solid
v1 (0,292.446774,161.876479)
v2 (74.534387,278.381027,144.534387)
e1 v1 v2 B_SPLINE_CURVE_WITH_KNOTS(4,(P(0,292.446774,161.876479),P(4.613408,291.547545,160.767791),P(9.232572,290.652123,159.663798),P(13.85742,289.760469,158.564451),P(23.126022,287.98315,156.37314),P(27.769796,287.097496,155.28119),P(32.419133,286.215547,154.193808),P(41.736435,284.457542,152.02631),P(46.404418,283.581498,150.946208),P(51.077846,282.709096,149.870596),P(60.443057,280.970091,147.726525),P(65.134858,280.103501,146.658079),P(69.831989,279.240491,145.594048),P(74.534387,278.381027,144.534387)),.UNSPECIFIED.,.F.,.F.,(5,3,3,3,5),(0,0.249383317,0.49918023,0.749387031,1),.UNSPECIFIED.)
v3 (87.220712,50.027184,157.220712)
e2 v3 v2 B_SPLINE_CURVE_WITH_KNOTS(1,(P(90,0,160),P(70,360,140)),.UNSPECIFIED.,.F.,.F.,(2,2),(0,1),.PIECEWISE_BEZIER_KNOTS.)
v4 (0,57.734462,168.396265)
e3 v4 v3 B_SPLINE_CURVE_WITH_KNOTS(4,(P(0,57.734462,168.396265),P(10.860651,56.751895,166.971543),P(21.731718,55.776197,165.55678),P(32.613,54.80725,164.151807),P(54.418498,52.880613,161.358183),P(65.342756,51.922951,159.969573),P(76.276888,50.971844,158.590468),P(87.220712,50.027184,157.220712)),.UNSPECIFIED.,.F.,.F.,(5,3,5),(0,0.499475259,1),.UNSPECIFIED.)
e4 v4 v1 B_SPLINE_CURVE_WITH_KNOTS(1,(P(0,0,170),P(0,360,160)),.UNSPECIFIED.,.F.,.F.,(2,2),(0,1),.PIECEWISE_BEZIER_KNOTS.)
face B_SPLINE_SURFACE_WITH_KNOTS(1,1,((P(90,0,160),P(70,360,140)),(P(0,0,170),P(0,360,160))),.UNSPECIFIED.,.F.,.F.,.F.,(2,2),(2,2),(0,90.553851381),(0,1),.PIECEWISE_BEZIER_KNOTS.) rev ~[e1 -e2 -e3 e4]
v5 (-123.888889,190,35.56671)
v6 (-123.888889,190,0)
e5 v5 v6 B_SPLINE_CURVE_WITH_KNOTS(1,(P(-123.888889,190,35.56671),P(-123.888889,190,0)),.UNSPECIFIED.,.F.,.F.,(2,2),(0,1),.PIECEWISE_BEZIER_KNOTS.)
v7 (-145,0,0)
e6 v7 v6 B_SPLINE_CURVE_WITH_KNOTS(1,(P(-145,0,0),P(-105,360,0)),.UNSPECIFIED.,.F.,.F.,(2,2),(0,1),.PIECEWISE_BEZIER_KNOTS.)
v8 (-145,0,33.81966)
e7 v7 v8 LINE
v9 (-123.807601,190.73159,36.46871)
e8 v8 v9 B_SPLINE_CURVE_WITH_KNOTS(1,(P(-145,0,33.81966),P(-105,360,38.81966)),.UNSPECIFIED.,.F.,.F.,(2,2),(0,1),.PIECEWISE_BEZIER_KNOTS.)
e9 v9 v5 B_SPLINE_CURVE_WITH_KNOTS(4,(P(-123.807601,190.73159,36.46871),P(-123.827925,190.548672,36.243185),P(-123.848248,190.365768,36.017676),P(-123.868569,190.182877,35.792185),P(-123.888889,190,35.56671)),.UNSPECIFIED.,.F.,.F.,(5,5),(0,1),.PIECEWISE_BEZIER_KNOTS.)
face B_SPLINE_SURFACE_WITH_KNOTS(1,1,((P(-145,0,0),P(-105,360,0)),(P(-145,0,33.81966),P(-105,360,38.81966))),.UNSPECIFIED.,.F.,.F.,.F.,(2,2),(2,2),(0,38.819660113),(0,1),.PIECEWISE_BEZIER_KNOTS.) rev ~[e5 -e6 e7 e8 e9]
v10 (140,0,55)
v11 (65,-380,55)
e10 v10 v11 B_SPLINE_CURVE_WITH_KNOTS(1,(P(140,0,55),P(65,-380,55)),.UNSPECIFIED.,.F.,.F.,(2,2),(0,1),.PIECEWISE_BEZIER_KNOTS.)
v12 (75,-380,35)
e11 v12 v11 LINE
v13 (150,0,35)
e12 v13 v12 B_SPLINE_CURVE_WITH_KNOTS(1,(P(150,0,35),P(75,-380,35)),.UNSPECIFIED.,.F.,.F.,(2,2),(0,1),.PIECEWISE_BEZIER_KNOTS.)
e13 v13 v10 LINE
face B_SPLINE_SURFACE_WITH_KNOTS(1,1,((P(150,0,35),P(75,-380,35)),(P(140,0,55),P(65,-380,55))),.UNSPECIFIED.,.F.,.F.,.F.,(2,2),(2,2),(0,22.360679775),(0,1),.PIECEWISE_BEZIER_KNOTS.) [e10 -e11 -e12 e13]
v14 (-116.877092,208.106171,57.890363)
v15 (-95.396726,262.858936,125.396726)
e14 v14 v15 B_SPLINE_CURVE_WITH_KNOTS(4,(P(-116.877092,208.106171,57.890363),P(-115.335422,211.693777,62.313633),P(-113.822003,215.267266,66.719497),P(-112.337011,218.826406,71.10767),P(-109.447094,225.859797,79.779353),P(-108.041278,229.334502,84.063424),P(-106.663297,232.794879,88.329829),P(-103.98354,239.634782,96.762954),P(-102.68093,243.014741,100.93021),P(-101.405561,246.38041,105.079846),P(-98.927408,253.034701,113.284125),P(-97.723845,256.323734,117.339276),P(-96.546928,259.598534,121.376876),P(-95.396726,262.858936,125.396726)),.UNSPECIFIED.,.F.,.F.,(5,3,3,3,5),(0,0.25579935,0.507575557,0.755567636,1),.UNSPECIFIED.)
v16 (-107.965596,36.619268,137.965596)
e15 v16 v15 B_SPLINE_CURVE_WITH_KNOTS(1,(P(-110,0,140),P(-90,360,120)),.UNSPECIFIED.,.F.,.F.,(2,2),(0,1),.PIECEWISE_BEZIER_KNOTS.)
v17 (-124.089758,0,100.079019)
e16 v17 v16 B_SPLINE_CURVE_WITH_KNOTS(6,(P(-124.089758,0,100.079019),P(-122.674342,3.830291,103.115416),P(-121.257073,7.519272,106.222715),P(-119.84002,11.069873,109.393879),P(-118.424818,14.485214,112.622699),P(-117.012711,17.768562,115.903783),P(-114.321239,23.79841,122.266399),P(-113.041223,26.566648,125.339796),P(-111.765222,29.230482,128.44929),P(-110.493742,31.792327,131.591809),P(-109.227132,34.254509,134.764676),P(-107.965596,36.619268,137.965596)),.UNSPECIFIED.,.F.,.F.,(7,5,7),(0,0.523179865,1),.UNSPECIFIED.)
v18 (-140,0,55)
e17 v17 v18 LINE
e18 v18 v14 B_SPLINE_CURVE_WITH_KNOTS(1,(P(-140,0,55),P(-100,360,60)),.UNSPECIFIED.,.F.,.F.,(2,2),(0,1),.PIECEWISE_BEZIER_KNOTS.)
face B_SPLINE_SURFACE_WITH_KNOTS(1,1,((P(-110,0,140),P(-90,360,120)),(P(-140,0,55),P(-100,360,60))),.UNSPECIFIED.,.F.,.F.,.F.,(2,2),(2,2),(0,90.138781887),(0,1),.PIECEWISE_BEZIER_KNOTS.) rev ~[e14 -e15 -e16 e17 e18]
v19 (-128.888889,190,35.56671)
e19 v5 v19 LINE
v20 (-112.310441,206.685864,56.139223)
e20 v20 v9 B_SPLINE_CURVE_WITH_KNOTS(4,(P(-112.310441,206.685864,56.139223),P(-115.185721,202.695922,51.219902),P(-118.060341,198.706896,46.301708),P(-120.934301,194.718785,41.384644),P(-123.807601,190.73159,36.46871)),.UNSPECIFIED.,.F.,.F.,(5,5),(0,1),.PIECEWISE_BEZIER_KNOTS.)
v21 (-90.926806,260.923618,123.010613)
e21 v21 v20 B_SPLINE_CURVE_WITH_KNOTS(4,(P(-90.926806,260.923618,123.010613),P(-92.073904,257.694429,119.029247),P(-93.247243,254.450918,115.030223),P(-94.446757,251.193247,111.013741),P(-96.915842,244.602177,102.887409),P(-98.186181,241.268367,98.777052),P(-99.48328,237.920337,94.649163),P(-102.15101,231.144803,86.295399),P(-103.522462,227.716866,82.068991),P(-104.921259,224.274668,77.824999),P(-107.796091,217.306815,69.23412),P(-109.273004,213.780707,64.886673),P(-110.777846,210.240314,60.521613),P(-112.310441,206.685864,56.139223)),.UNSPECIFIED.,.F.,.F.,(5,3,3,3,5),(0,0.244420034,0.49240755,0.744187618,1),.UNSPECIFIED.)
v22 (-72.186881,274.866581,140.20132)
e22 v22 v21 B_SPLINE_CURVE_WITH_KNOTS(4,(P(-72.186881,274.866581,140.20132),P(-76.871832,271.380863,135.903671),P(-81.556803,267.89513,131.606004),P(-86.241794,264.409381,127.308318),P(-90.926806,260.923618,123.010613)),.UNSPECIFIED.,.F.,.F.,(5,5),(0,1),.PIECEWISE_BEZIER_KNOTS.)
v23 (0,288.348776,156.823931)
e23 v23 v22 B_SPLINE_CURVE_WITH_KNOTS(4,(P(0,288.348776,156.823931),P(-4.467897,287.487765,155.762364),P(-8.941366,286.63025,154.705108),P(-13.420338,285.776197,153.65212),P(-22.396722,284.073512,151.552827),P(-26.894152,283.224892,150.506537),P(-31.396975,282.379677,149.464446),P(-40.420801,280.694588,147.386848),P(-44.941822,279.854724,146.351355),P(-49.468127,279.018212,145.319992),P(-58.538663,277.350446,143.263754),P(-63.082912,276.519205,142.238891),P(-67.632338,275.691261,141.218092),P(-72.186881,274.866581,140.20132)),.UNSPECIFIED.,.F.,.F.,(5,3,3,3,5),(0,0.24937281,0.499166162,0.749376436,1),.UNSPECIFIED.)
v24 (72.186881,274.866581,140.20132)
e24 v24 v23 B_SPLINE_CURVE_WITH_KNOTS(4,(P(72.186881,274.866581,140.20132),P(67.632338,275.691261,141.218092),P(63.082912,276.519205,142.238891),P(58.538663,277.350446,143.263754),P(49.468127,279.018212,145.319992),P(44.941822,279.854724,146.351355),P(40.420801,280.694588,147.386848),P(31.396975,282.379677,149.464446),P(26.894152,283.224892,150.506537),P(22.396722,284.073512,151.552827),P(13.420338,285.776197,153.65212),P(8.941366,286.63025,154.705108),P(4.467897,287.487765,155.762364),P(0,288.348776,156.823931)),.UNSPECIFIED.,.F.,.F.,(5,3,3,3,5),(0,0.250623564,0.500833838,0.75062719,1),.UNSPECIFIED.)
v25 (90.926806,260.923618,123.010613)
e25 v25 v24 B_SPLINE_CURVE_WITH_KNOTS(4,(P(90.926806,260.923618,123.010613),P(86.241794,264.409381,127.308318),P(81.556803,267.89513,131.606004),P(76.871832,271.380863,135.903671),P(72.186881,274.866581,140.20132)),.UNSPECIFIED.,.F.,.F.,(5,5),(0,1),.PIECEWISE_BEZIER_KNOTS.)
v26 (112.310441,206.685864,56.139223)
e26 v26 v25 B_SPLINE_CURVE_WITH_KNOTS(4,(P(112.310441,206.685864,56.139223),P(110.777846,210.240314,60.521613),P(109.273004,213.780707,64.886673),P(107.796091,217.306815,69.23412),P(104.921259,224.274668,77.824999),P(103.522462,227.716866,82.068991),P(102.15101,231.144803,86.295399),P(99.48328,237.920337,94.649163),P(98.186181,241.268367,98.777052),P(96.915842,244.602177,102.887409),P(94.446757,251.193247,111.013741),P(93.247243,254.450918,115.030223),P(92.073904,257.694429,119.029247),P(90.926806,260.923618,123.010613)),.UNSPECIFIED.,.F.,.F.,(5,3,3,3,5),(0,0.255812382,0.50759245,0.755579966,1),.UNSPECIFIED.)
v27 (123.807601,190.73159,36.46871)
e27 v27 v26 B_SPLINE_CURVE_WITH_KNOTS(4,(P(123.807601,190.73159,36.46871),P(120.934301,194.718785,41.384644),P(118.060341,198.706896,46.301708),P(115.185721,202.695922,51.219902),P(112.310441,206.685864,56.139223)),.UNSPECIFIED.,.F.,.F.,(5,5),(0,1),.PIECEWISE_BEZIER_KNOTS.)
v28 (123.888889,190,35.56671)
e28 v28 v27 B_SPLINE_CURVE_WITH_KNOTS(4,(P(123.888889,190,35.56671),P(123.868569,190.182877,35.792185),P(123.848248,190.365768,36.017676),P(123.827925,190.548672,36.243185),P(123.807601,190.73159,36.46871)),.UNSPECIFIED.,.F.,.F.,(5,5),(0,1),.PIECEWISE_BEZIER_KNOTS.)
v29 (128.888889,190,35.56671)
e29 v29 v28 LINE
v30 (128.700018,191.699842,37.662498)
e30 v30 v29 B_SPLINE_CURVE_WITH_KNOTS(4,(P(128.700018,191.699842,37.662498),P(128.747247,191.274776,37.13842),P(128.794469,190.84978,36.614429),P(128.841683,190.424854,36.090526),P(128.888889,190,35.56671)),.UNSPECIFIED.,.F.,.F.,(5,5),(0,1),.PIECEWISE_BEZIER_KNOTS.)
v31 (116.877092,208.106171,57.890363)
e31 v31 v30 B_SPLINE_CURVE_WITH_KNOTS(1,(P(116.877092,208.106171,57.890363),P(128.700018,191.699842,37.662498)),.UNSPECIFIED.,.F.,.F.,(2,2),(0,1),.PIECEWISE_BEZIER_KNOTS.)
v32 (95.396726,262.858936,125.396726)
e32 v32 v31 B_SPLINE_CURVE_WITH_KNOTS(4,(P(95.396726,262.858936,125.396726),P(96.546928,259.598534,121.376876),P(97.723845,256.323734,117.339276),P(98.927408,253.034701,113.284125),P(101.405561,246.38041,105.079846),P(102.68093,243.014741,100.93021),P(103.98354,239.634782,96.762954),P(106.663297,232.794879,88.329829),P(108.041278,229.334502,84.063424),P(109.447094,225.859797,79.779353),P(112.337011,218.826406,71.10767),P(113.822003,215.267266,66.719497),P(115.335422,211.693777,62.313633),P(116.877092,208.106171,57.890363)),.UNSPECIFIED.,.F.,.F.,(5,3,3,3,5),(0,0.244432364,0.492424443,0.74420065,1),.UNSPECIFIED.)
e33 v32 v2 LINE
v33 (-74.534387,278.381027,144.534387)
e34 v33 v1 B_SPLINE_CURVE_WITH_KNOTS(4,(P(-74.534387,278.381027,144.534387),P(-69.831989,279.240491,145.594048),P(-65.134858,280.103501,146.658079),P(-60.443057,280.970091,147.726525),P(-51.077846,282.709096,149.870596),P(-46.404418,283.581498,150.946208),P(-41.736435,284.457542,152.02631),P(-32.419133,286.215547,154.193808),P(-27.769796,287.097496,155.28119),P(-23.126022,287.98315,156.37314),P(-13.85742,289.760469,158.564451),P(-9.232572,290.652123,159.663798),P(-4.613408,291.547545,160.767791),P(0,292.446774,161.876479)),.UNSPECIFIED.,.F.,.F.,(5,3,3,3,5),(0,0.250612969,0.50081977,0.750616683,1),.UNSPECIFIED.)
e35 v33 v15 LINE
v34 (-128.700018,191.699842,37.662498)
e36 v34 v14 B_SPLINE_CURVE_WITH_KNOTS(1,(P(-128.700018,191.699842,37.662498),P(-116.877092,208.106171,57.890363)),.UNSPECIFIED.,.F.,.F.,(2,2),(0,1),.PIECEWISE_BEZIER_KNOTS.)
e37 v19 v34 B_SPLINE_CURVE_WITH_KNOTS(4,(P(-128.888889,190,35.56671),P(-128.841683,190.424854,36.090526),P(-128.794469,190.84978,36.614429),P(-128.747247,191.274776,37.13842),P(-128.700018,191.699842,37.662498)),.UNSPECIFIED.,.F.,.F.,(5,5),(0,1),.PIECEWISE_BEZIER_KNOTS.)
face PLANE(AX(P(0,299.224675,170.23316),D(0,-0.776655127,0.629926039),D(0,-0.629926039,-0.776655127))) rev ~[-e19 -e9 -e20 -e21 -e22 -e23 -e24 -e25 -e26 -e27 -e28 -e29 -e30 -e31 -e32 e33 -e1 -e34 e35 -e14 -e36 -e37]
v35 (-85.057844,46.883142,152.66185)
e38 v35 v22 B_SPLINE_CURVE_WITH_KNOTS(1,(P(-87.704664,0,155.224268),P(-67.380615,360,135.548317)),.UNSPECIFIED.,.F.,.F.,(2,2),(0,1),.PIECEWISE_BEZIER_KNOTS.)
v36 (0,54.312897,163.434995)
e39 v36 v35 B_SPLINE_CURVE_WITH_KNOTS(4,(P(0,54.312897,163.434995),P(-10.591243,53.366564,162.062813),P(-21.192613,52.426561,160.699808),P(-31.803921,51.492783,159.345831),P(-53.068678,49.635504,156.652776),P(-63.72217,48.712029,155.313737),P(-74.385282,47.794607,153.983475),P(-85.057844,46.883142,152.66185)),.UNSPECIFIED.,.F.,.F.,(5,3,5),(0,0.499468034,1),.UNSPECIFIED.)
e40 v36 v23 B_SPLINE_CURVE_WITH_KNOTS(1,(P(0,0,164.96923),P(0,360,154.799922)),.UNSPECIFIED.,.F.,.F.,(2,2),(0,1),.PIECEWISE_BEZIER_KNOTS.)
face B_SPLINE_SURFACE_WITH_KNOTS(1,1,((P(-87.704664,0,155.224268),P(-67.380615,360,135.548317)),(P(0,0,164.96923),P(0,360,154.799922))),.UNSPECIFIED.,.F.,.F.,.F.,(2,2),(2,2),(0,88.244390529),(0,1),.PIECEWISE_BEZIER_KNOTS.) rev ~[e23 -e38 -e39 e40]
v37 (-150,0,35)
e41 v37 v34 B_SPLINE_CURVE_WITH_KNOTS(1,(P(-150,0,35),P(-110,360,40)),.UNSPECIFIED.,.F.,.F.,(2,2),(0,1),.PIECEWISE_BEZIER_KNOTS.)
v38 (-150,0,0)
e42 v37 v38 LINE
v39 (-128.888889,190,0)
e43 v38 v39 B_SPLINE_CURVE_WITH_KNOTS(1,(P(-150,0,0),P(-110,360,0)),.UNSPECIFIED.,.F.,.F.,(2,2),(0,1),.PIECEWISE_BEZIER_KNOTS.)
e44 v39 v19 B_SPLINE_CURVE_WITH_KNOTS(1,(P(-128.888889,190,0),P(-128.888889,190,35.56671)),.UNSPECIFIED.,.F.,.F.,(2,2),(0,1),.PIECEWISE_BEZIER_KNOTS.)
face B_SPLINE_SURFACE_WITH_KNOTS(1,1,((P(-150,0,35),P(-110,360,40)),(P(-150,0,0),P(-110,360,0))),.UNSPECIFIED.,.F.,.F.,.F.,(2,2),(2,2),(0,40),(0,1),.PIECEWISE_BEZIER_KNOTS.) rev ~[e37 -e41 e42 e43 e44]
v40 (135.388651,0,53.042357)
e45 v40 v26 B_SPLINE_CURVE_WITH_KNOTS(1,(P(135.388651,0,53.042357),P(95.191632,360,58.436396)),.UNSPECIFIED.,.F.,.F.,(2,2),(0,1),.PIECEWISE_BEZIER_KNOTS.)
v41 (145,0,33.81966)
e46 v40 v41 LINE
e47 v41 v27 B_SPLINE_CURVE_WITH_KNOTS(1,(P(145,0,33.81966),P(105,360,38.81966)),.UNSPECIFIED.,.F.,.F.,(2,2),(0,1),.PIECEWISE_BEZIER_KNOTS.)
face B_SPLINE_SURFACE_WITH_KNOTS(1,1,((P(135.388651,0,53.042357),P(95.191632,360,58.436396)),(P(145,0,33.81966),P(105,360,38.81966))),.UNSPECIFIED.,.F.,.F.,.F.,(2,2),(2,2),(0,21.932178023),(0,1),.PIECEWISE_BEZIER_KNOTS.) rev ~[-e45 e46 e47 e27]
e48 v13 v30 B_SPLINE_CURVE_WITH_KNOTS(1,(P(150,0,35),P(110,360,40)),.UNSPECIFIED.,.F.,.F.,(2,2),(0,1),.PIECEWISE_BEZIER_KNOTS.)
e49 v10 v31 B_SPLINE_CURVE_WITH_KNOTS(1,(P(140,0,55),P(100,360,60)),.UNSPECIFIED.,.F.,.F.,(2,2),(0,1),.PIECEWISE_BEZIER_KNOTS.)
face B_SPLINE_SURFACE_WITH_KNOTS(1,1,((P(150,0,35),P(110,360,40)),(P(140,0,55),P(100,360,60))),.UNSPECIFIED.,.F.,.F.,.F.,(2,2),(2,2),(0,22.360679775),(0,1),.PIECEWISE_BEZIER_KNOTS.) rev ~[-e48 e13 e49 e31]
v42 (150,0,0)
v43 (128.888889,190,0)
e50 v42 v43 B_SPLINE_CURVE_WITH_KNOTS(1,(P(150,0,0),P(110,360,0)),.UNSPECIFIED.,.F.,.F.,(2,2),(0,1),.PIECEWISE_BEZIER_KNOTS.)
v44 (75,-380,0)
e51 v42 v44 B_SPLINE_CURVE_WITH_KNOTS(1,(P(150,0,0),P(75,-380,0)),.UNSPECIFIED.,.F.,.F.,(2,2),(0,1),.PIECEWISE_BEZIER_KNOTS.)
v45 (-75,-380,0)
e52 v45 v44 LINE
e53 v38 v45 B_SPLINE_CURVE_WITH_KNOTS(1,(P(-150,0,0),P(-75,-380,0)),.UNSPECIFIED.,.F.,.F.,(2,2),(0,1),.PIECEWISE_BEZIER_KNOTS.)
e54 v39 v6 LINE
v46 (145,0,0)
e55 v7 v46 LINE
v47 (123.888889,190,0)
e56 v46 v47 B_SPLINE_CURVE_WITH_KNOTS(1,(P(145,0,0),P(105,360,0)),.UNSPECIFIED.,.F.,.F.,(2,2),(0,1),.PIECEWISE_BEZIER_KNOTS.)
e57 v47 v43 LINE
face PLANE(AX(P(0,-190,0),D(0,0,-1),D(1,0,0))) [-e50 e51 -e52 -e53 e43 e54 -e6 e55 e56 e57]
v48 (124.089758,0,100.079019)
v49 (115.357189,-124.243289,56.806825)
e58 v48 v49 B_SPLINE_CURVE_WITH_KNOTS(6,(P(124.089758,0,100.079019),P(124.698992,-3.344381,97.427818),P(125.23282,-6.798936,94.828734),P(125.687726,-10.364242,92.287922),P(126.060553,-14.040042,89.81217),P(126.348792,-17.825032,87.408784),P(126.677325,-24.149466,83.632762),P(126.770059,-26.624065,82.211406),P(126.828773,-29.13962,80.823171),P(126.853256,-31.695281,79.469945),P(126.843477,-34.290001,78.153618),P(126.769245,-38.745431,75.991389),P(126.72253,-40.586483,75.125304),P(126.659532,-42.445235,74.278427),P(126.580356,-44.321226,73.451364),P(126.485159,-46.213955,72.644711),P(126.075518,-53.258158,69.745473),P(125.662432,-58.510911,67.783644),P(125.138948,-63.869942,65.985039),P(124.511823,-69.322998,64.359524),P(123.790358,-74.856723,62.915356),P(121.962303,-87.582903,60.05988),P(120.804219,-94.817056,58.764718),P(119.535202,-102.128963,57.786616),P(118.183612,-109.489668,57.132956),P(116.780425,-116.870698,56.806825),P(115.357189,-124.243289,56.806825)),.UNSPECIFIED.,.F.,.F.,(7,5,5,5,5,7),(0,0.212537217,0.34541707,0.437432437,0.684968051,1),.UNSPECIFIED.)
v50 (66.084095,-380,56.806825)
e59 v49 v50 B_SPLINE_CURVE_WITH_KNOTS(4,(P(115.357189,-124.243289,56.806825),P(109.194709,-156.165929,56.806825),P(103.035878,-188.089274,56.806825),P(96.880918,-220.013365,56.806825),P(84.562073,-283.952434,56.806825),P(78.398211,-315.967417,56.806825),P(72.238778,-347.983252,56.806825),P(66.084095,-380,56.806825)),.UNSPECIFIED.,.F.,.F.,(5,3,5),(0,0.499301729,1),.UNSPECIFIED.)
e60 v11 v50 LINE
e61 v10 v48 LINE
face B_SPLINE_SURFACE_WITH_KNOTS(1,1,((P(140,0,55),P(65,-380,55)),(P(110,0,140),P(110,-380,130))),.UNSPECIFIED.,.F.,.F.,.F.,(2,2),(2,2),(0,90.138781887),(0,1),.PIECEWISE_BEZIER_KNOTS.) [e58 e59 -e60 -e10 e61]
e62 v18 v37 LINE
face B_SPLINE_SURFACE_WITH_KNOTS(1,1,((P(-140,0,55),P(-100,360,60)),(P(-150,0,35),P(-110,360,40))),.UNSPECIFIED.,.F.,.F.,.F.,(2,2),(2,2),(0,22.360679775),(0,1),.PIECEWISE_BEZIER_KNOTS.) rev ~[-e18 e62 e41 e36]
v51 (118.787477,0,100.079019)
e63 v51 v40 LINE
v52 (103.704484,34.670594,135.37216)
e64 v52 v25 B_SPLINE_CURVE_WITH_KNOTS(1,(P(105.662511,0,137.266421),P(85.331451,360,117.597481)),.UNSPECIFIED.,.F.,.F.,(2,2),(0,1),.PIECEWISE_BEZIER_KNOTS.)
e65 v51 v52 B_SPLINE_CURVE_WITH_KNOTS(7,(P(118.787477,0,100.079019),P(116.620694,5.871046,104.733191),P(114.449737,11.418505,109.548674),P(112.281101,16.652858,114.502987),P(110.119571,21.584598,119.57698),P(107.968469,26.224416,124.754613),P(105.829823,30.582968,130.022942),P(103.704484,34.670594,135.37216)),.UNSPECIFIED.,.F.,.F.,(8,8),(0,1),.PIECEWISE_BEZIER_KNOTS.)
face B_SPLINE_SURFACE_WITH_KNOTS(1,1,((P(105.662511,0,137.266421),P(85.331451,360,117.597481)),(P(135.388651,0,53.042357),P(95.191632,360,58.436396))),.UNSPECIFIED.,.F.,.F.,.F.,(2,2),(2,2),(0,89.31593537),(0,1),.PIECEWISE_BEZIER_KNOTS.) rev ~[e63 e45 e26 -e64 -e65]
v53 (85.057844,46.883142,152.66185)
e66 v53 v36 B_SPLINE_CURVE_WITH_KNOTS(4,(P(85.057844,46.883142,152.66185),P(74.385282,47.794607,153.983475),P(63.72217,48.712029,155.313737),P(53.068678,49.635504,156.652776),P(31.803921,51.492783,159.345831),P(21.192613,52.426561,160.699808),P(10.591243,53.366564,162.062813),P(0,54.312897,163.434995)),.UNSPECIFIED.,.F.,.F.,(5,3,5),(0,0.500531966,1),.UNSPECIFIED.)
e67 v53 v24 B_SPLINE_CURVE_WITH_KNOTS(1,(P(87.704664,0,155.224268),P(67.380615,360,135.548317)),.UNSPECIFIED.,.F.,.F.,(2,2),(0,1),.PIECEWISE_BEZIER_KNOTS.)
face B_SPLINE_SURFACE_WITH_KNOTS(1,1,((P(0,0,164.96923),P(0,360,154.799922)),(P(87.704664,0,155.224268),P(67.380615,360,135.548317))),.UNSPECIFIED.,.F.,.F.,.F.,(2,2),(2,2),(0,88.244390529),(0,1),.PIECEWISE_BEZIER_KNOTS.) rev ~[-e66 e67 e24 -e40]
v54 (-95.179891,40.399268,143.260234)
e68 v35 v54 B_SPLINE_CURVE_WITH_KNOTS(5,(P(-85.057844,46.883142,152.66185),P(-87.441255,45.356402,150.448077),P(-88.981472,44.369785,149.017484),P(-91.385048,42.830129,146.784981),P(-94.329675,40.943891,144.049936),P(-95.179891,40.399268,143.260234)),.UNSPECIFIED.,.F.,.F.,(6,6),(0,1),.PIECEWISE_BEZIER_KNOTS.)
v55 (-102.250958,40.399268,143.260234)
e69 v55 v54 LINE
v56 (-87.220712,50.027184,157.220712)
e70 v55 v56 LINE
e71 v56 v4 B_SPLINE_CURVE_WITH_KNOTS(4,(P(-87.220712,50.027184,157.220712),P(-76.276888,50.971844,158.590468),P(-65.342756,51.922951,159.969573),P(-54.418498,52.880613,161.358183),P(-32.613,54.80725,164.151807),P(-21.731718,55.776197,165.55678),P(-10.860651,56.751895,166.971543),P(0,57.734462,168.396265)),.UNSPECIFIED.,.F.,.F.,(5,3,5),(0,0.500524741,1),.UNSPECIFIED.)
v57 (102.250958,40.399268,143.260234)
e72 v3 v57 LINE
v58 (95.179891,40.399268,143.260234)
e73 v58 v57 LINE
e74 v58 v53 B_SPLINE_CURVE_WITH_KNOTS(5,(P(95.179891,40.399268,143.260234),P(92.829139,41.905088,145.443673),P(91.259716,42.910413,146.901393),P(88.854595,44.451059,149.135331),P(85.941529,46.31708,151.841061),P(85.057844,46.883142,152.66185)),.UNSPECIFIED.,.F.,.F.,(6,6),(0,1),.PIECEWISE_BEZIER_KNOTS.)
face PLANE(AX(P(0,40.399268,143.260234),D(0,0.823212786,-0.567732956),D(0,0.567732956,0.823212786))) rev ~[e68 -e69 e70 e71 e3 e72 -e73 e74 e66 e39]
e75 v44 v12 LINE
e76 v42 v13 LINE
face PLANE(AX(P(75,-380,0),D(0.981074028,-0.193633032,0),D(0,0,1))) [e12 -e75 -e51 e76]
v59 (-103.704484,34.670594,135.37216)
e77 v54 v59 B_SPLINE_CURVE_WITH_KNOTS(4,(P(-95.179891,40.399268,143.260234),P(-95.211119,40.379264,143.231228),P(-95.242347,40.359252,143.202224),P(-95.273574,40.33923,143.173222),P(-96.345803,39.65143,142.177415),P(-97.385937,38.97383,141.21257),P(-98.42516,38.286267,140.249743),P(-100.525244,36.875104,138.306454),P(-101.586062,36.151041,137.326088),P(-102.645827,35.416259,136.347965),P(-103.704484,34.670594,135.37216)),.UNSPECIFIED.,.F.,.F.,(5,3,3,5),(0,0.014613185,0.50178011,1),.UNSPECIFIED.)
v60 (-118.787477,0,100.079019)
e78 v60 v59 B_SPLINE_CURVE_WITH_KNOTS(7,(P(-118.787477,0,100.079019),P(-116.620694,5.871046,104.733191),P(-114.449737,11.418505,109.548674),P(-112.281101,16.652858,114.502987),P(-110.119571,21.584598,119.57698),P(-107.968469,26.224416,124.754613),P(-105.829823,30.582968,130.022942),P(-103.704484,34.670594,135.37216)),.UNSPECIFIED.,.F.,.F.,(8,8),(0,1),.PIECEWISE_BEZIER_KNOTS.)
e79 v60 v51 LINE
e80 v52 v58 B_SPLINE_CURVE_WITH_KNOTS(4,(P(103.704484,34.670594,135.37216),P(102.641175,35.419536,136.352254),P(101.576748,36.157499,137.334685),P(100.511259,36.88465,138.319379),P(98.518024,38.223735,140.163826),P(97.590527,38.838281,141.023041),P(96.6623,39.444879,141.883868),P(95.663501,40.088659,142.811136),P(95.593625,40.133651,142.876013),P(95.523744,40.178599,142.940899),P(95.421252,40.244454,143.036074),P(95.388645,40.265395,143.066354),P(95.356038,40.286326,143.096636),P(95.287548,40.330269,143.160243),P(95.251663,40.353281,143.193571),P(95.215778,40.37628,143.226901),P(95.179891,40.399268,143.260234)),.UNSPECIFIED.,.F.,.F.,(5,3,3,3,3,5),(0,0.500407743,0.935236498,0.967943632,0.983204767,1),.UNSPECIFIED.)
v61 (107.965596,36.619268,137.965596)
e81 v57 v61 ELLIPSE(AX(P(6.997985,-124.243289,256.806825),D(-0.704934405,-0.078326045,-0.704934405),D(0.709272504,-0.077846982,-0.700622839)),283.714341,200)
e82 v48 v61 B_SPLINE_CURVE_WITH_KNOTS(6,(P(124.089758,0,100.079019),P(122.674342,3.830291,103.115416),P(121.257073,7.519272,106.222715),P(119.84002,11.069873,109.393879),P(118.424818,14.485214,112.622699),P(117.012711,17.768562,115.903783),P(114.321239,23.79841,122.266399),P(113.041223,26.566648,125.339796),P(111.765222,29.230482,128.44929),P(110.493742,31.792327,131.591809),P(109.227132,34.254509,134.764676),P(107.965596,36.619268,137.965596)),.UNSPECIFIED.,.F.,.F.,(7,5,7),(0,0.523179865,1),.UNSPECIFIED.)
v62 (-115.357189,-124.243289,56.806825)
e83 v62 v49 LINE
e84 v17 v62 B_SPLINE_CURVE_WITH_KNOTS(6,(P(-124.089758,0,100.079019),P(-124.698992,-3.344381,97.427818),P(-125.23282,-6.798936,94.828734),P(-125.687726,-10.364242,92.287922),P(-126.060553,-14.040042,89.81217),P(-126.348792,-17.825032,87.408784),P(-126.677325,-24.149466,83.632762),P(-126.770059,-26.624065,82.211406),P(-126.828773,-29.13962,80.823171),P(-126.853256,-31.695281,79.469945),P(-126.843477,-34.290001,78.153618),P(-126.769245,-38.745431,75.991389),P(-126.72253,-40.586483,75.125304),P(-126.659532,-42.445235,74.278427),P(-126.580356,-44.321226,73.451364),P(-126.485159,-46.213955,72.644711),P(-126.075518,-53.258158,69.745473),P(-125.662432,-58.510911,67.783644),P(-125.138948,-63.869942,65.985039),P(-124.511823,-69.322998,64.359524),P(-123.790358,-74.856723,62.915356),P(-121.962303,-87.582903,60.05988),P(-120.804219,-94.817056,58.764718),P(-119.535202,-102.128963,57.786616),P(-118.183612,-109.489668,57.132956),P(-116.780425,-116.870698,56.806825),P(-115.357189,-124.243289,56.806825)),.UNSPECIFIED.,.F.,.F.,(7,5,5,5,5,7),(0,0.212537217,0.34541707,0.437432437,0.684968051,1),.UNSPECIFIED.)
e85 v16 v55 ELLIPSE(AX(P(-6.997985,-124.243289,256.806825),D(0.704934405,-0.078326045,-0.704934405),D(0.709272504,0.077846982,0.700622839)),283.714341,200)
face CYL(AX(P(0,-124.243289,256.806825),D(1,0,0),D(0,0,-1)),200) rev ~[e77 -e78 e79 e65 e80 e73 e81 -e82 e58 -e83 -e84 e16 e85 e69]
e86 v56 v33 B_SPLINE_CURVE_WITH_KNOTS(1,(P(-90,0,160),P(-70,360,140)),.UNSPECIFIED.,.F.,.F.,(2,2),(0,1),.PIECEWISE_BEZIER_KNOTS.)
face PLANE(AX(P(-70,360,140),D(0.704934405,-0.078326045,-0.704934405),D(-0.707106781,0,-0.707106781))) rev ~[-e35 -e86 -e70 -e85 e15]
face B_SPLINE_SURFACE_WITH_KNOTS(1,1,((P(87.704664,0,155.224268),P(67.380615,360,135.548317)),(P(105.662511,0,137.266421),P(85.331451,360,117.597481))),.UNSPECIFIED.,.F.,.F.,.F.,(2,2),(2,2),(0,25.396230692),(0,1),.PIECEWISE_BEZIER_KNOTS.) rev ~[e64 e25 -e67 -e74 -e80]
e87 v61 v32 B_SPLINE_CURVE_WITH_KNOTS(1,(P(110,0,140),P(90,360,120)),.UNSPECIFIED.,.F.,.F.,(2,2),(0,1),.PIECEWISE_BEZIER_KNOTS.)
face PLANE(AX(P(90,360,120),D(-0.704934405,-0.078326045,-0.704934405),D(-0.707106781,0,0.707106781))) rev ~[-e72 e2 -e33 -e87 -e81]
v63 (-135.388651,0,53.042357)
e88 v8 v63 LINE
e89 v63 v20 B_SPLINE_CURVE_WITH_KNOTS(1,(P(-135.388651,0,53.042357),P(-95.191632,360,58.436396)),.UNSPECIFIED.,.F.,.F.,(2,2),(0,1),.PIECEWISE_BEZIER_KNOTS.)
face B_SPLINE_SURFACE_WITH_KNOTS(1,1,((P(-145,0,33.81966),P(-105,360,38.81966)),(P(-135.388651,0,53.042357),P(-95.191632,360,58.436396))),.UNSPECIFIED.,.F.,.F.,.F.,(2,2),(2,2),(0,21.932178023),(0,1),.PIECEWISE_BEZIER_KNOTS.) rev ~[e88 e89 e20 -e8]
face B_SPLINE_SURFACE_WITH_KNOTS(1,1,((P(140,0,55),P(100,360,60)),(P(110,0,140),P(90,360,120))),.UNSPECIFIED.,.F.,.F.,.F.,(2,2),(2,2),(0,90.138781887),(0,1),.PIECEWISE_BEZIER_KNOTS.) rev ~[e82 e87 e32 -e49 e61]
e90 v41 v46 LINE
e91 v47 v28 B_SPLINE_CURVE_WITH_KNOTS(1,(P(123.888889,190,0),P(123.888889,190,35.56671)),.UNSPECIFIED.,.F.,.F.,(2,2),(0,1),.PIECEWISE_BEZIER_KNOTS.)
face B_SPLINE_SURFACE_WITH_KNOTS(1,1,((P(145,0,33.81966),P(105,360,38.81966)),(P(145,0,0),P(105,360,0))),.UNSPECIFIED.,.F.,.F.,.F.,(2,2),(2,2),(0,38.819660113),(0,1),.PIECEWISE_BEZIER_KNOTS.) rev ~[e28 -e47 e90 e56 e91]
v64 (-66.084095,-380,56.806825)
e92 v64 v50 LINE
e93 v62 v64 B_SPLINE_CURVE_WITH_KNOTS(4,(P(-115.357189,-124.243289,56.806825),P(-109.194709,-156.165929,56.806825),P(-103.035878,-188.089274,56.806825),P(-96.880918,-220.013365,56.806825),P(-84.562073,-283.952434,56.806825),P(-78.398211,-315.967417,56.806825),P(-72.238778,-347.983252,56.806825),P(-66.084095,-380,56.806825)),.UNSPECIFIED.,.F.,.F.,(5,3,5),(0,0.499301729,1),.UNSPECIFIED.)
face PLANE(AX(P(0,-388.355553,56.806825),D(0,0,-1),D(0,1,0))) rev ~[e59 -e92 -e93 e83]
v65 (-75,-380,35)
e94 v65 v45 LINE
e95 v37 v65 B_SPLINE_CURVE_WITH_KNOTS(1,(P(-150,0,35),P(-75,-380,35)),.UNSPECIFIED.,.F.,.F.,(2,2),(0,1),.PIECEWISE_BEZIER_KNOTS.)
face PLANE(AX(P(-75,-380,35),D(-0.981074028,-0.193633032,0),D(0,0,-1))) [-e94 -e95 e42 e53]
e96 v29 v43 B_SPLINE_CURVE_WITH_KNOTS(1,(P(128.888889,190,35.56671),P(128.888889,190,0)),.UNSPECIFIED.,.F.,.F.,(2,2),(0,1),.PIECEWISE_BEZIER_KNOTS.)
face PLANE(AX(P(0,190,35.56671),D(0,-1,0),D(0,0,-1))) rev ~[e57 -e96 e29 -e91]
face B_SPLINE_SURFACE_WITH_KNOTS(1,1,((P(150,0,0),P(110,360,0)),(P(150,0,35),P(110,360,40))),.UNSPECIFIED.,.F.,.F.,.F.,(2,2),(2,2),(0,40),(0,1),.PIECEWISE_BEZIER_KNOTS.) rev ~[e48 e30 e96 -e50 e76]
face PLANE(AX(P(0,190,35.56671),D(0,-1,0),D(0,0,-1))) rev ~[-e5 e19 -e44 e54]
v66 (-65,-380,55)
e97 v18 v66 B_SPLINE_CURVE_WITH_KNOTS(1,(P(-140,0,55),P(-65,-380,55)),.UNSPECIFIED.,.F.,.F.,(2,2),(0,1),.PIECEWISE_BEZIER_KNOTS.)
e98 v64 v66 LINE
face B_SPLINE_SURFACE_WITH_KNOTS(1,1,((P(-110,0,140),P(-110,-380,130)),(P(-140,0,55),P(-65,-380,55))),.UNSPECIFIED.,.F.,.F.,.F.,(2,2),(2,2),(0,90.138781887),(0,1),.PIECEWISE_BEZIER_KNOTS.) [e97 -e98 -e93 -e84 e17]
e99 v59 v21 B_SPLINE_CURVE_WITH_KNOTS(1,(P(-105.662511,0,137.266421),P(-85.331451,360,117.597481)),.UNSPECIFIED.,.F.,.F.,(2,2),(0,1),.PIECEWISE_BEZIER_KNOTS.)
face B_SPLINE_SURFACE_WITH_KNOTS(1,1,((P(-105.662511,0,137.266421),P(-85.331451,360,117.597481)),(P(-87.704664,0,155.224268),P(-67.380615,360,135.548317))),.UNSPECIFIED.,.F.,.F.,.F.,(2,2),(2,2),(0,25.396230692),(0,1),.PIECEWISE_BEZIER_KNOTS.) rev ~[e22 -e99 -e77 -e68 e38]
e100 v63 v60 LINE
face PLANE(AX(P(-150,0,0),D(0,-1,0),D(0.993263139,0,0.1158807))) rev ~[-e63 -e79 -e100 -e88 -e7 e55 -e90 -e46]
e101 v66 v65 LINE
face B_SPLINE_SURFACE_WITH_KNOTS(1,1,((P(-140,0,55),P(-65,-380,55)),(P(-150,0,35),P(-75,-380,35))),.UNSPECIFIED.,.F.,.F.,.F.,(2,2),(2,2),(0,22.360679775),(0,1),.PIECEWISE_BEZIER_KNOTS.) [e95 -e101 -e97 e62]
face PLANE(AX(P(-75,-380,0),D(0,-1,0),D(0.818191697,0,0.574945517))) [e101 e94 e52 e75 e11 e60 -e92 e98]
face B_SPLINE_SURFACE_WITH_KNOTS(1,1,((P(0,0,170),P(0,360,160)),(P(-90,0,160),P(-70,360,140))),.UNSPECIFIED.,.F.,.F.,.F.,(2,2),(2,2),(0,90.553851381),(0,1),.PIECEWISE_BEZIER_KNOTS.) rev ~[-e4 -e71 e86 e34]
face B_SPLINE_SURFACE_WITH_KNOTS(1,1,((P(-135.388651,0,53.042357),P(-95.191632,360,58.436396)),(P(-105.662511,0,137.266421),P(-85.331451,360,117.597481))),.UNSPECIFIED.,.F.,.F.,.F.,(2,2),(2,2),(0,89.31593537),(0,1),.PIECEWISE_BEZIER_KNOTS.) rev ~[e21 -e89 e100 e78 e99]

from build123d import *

# Parameters (mm, degrees)
F6_DEPTH  = 150
F11_DEPTH = 150


# Not quite as in the source:
# - a feature names something its author has since deleted; it is built from what else it names


with BuildPart() as f4:
    # F2 (on Front) → F4 section 0
    with BuildSketch(Plane.XZ):
        Polygon((145, 0), (150, 0), (150, 35), (140, 55), (110, 140), (90, 160), (0, 170), (-90, 160), (-110, 140), (-140, 55), (-150, 35), (-150, 0), (-145, 0), (-145, 33.8196601125), (-135.3886514877, 53.0423571371), (-105.6625113622, 137.2664208259), (-87.704664423, 155.2242677651), (0, 164.9692304788), (87.704664423, 155.2242677651), (105.6625113622, 137.2664208259), (135.3886514877, 53.0423571371), (145, 33.8196601125), align=None)
    # F3 (on offset) → F4 section 1
    with BuildSketch(Plane.XZ.offset(-360)):
        Polygon((105, 0), (110, 0), (110, 40), (100, 60), (90, 120), (70, 140), (0, 160), (-70, 140), (-90, 120), (-100, 60), (-110, 40), (-110, 0), (-105, 0), (-105, 38.8196601125), (-95.191631809, 58.4363964945), (-85.3314510321, 117.5974811561), (-67.3806149527, 135.5483172355), (0, 154.7999215077), (67.3806149527, 135.5483172355), (85.3314510321, 117.5974811561), (95.191631809, 58.4363964945), (105, 38.8196601125), align=None)
    loft()

    # F5 (on Right) → F6 (cut, symmetric)
    with BuildSketch(Plane.YZ):
        Polygon((190, 35.5667099357), (190, 0), (189.9669915438, -2.0382583607), (17.2620066122, -21.4886017568), (427.6157569008, -24.6490443013), (429.8257231712, 105.1867231727), (363.7629151344, 190.5601769686), (299.2246747017, 170.2331602573), align=None)
    extrude(amount=F6_DEPTH, both=True, mode=Mode.SUBTRACT)

    # F8 (on Front) → F9 section 0
    with BuildSketch(Plane.XZ):
        Polygon((-150, 0), (150, 0), (150, 35), (140, 55), (110, 140), (90, 160), (0, 170), (-90, 160), (-110, 140), (-140, 55), (-150, 35), align=None)
    # F7 (on offset) → F9 section 1
    with BuildSketch(Plane.XZ.offset(380)):
        Polygon((-75, 0), (75, 0), (75, 35), (65, 55), (110, 130), (90, 150), (0, 160), (-90, 150), (-110, 130), (-65, 55), (-75, 35), align=None)
    loft()

    # F10 (on Right) → F11 (cut, symmetric)
    with BuildSketch(Plane.YZ):
        with BuildLine():
            Line((-388.3555531502, 56.8068251014), (-124.2432887277, 56.8068251014))
            ThreePointArc((-124.2432887277, 56.8068251014), (-31.2629634759, 79.7343565579), (40.3992684554, 143.2602339406))
            Line((40.3992684554, 143.2602339406), (80.7762278766, 201.8068251014))
            Line((80.7762278766, 201.8068251014), (45.3817601157, 256.7874745919))
            Line((45.3817601157, 256.7874745919), (-388.3555531502, 199.957123117))
            Line((-388.3555531502, 199.957123117), (-388.3555531502, 56.8068251014))
        make_face()
    extrude(amount=F11_DEPTH, both=True, mode=Mode.SUBTRACT)


solid = f4.part
